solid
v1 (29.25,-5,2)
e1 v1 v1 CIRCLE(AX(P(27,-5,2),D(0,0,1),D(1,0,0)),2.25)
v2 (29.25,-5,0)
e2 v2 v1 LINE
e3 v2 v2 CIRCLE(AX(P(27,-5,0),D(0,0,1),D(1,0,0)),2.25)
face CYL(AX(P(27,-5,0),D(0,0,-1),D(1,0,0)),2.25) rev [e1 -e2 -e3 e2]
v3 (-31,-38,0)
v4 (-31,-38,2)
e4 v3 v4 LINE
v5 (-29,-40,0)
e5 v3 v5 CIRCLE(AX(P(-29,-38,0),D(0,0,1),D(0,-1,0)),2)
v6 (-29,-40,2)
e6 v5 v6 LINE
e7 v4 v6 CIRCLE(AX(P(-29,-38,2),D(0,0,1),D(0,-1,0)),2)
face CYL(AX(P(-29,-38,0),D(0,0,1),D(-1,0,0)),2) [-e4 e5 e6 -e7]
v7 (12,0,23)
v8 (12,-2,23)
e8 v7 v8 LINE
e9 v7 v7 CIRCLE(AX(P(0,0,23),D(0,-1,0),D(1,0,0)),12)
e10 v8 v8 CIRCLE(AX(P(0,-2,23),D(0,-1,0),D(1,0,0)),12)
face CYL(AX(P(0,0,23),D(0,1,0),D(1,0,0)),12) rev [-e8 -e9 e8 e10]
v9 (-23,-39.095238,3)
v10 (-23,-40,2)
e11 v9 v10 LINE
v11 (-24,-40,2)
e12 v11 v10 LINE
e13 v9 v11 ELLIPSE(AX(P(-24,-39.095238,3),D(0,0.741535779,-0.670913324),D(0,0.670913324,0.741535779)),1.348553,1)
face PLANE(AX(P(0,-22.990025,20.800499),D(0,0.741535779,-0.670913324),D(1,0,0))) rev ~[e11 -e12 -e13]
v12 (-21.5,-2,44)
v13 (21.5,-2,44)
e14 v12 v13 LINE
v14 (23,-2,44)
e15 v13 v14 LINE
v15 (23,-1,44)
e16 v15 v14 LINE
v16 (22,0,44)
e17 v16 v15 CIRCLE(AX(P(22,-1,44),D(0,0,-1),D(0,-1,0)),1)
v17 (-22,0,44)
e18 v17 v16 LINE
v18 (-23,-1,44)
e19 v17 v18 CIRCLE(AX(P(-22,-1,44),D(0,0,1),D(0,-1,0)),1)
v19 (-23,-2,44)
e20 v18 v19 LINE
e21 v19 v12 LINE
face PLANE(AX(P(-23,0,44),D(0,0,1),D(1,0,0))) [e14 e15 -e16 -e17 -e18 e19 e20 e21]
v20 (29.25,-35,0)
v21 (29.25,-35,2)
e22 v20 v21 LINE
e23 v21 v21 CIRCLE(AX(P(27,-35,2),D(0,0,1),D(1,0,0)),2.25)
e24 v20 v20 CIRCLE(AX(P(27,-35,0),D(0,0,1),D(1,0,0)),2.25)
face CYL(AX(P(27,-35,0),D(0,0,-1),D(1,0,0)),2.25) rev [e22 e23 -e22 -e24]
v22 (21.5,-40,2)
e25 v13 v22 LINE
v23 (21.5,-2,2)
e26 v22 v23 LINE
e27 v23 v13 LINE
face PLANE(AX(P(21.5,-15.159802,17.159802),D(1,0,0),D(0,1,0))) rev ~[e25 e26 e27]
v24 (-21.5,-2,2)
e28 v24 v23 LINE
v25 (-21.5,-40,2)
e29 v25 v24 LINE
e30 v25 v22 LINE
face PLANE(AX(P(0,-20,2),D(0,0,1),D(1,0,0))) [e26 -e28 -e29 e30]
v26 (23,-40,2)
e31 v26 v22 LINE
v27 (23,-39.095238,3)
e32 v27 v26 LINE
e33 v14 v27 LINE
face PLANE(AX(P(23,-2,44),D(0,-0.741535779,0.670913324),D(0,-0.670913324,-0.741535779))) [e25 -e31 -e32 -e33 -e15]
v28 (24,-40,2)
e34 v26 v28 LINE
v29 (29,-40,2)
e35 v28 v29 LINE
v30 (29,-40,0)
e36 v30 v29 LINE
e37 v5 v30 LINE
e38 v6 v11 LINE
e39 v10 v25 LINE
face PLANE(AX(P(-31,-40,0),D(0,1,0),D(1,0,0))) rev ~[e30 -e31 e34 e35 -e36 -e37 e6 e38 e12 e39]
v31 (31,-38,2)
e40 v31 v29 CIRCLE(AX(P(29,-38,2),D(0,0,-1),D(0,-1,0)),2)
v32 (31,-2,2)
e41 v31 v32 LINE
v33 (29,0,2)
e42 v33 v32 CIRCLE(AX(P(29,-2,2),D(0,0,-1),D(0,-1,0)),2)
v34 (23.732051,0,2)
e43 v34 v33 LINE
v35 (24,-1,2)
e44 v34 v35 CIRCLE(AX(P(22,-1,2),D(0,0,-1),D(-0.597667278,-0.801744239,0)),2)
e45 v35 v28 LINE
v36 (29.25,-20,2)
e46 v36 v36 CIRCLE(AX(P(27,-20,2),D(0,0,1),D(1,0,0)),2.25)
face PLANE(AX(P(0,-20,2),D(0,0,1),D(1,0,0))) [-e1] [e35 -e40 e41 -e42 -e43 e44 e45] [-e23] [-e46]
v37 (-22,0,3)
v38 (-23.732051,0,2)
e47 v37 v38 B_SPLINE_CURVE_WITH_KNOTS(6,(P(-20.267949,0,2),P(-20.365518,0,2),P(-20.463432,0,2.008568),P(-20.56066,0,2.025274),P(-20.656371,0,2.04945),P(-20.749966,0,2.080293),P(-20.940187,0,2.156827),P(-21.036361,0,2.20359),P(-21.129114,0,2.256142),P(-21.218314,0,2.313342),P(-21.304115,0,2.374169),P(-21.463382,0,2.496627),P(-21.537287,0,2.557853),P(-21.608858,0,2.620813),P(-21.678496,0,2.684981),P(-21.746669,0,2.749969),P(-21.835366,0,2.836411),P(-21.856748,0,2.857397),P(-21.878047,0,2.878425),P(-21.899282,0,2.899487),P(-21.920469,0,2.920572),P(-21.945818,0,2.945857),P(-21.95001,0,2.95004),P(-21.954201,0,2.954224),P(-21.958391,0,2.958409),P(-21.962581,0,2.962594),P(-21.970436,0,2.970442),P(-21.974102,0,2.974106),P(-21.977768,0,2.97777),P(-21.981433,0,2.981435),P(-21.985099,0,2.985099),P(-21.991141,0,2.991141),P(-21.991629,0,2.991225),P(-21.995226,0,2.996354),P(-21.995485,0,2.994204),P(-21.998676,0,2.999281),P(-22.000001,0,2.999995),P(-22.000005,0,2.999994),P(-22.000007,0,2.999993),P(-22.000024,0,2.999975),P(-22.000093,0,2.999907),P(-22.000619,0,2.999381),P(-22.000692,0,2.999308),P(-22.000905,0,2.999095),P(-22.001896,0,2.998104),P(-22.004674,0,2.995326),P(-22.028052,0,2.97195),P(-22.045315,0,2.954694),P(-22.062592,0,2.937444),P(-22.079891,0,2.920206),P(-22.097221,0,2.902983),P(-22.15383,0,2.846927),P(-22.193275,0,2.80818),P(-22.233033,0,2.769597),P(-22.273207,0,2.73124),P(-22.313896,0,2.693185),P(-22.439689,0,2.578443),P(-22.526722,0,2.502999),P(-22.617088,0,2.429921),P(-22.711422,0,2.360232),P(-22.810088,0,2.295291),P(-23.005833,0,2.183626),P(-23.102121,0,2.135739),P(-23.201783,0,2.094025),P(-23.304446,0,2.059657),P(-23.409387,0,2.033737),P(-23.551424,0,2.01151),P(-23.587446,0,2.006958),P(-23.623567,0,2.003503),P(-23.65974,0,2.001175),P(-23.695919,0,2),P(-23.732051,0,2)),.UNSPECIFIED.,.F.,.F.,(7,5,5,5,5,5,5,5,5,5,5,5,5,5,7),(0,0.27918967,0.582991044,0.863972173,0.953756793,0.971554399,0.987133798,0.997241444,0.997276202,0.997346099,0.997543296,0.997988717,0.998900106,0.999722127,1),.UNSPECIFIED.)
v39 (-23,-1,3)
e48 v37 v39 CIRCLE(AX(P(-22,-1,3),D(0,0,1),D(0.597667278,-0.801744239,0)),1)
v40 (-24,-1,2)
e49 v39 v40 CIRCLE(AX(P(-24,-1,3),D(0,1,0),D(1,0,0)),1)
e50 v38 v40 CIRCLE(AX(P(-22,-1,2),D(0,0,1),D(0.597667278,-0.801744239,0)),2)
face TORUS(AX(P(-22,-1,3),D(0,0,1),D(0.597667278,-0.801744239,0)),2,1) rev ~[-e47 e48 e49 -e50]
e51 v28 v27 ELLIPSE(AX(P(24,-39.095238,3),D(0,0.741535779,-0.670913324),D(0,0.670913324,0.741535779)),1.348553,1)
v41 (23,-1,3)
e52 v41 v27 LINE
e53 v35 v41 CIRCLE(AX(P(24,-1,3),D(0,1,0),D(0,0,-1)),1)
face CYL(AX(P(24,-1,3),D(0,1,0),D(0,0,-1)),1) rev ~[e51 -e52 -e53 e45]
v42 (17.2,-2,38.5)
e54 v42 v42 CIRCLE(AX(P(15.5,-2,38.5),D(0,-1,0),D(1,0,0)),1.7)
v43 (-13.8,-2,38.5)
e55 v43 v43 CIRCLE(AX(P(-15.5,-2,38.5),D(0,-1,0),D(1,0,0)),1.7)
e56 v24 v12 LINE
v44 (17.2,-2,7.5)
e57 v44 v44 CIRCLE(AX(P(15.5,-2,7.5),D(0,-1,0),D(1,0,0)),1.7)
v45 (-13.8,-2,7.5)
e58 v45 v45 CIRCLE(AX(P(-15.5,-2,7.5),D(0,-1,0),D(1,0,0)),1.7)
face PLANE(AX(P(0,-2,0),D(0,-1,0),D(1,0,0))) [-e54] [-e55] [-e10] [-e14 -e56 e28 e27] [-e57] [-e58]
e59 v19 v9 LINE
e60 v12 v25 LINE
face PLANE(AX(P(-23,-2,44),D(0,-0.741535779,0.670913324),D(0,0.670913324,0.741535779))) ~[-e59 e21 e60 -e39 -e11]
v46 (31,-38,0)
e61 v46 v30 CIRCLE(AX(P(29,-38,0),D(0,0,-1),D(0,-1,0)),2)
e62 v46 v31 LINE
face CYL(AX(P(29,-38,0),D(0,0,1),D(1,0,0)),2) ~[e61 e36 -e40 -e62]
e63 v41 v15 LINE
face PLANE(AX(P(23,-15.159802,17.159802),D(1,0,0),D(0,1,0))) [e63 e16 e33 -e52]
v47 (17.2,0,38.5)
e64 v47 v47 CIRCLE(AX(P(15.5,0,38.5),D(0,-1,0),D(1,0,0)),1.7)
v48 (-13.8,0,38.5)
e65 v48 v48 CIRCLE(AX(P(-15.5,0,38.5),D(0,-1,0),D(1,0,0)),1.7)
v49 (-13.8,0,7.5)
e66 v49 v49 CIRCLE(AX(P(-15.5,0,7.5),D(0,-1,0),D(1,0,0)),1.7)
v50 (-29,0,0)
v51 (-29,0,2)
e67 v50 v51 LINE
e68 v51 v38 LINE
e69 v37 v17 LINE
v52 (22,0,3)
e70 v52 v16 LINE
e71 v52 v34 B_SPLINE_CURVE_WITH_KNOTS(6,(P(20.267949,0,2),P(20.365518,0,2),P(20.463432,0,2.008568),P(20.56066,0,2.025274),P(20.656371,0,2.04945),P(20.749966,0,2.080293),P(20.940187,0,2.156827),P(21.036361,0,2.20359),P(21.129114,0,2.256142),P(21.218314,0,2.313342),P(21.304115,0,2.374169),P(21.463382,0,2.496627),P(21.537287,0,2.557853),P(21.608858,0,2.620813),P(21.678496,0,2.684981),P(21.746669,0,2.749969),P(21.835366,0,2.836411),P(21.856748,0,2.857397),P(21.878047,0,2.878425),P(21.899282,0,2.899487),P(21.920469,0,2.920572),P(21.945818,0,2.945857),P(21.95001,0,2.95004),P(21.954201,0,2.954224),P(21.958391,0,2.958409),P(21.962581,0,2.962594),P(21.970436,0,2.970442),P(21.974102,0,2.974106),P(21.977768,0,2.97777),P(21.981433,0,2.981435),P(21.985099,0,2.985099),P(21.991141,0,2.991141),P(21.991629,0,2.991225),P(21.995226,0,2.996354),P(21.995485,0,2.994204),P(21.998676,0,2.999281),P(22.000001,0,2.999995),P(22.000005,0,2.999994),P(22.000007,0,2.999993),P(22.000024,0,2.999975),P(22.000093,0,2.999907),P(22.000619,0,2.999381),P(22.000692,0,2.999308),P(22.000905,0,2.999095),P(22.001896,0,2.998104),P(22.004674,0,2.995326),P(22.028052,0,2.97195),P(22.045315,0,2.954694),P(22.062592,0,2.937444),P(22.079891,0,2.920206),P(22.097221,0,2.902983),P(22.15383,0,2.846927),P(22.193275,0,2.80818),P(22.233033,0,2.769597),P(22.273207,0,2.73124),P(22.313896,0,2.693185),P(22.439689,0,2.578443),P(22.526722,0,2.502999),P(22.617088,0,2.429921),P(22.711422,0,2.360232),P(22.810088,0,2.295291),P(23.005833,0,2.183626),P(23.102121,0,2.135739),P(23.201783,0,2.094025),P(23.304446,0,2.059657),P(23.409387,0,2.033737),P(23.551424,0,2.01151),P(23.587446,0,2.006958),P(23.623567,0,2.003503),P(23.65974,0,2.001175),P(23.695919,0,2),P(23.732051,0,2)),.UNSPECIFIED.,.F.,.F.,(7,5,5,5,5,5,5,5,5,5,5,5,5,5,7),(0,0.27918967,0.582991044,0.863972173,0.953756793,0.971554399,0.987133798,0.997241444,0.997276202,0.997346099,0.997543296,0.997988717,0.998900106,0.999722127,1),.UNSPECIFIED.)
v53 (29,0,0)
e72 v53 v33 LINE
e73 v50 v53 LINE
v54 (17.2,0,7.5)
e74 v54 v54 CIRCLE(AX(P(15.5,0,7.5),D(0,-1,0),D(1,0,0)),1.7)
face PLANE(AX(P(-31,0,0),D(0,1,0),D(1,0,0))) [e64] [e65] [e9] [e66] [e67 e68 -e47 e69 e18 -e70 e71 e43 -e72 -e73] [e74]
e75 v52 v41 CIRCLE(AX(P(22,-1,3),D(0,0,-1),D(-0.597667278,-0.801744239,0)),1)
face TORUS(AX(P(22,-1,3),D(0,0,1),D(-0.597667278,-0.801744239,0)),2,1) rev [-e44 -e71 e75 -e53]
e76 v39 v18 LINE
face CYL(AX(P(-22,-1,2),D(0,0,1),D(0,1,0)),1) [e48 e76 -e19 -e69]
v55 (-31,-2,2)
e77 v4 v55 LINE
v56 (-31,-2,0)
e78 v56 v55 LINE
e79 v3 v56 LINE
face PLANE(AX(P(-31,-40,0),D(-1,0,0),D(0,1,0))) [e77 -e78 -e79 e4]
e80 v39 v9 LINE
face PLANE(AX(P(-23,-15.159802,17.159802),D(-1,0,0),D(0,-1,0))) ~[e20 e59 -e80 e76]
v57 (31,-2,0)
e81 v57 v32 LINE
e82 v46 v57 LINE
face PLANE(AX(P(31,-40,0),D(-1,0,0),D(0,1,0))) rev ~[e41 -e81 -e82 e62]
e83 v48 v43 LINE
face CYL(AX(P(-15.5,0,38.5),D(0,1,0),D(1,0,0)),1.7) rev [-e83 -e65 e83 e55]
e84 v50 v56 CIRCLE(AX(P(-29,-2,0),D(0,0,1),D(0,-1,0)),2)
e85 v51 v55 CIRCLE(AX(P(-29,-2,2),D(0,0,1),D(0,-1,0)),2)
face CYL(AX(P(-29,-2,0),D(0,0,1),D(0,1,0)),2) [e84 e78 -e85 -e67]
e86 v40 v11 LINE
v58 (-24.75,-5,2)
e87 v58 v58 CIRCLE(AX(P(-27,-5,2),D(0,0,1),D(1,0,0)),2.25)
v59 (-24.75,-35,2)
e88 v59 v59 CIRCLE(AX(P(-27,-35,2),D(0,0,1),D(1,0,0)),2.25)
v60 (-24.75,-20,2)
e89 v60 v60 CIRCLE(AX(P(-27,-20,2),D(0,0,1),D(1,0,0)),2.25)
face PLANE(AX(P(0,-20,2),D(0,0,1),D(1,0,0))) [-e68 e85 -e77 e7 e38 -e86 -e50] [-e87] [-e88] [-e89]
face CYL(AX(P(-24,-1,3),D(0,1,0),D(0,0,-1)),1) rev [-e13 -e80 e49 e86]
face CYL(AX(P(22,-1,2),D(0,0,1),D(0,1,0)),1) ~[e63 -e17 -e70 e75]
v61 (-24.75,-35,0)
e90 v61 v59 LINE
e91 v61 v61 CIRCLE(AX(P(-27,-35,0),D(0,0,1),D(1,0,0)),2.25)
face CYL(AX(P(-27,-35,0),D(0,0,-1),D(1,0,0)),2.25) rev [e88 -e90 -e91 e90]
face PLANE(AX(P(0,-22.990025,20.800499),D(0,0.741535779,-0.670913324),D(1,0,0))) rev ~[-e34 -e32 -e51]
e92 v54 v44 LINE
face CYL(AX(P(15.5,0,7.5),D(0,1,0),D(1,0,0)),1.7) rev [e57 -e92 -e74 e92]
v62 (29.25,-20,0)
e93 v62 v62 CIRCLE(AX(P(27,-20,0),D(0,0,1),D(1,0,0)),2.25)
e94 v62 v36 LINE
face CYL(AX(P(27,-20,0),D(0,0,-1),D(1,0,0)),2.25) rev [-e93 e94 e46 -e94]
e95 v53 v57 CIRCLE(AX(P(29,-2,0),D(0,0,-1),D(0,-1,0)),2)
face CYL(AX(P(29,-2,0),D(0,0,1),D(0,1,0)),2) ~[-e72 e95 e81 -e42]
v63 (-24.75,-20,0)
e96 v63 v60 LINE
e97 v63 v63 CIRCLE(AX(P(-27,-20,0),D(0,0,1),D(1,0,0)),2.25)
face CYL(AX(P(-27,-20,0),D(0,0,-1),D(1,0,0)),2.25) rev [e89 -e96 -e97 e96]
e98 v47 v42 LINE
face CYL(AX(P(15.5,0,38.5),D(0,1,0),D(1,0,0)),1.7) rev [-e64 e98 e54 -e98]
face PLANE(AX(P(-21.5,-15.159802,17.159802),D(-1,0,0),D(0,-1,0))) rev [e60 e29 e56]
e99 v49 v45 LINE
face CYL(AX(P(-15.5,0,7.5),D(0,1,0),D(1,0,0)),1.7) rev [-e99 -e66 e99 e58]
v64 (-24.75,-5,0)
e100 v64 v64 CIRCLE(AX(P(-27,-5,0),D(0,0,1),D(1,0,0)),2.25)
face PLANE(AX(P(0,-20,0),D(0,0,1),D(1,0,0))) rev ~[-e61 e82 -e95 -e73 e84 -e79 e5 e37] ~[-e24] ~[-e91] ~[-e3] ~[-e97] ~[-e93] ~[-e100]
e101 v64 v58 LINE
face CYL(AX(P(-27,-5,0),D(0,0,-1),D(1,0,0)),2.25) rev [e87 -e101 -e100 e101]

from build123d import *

# Parameters (mm, degrees)
F0_W         = 62
F0_H         = 40
F0_R         = 2.25
F1_DEPTH     = 2
F2_W         = 46
F2_H         = 42
F2_R         = 1.7
F2_R_2       = 12
F3_DEPTH     = 2
F5_DEPTH     = 1.5
F6_R         = 2
F7_R         = 1
F8_T4_DEPTH  = 41.5
F8_T9_ANGLE  = 233.2969892374
F8_T15_ANGLE = 233.2969892374
F8_T21_DEPTH = 41.5


# Not quite as in the source:
# - a fillet or chamfer that OpenCascade refuses, or shapes differently, is made with other operations: its cross-section is extruded or revolved along the edge and cut away or added
# - a pattern or mirror of a feature is missing from the dataset's text; its kind, count and spacing are read off the source's solid


with BuildPart() as f1:
    # F0 (on Top) → F1 (new body)
    with BuildSketch(Plane.XY):
        with Locations((0, -20)):
            Rectangle(F0_W, F0_H)
        with Locations((-27, -35)):
            Circle(F0_R, mode=Mode.SUBTRACT)
        with Locations((27, -35)):
            Circle(F0_R, mode=Mode.SUBTRACT)
        with Locations((-27, -20)):
            Circle(F0_R, mode=Mode.SUBTRACT)
        with Locations((-27, -5)):
            Circle(F0_R, mode=Mode.SUBTRACT)
        with Locations((27, -20)):
            Circle(F0_R, mode=Mode.SUBTRACT)
        with Locations((27, -5)):
            Circle(F0_R, mode=Mode.SUBTRACT)
    extrude(amount=F1_DEPTH)

    # F2 (on Front) → F3 (join)
    with BuildSketch(Plane.XZ):
        with Locations((0, 23)):
            Rectangle(F2_W, F2_H)
        with Locations((-15.5, 7.5)):
            Circle(F2_R, mode=Mode.SUBTRACT)
        with Locations((15.5, 7.5)):
            Circle(F2_R, mode=Mode.SUBTRACT)
        with Locations((-15.5, 38.5)):
            Circle(F2_R, mode=Mode.SUBTRACT)
        with Locations((0, 23)):
            Circle(F2_R_2, mode=Mode.SUBTRACT)
        with Locations((15.5, 38.5)):
            Circle(F2_R, mode=Mode.SUBTRACT)
    extrude(amount=F3_DEPTH)

    # F4 (on face) → F5 (join)
    with BuildSketch(Plane.YZ.offset(23)):
        Polygon((-2, 2), (-2, 44), (-40, 2), align=None)
    f5 = extrude(amount=-F5_DEPTH)

    # F5_copies: F5 across plane
    add(f5.mirror(Plane(origin=(0, 0, 0), x_dir=(0, 0, -1), z_dir=(-1, 0, 0))))

    # F6
    f6_edges = [f1.edges().sort_by_distance(p)[0] for p in [
        (31, -40, 1),
        (31, 0, 1),
        (-31, 0, 1),
        (-31, -40, 1),
    ]]
    fillet(f6_edges, radius=F6_R)

    # F7
    f7_edges = [f1.edges().sort_by_distance(p)[0] for p in [
        (-23, 0, 23),
        (23, 0, 23),
    ]]
    fillet(f7_edges, radius=F7_R)

    # F8: fillet of radius 1 on 4 edges, made by hand


with BuildPart() as f8_tool2:
    # F8_s3 → F8_t4 (new body)
    with BuildSketch(Plane.XZ.offset(1)):
        with BuildLine():
            ThreePointArc((24, 2), (23.2928932188, 2.2928932188), (23, 3))
            Line((23, 3), (23, 2))
            Line((23, 2), (24, 2))
        make_face()
    extrude(amount=F8_T4_DEPTH)

    split(bisect_by=Plane(origin=(0, -22.9900249377, 20.8004987531), x_dir=(1, 0, 0), z_dir=(0, 0.7415357791, -0.670913324)), keep=Keep.TOP)


with BuildPart() as f1_1:
    add(f1.part)

    # F8_t1: union F8_tool2
    add(f8_tool2.part)


with BuildPart() as f8_tool7:
    # F8_s8 → F8_t9 (revolve)
    with BuildSketch(Plane(origin=(14.6206404523, -10.8990847056, 0), x_dir=(0, 0, 1), z_dir=(0.8017442393, -0.5976672776, 0))):
        with BuildLine():
            ThreePointArc((3, -11.3469358686), (2.2928932188, -11.0540426498), (2, -10.3469358686))
            Line((2, -10.3469358686), (2, -11.3469358686))
            Line((2, -11.3469358686), (3, -11.3469358686))
        make_face()
    revolve(axis=Axis((22, -1, 2), (0, 0, -1)), revolution_arc=F8_T9_ANGLE)

    split(bisect_by=Plane.XZ, keep=Keep.TOP)

    split(bisect_by=Plane.XZ.offset(2), keep=Keep.BOTTOM)


with BuildPart() as f1_2:
    add(f1_1.part)

    # F8_t6: union F8_tool7
    add(f8_tool7.part)


with BuildPart() as f8_tool13:
    # F8_s14 → F8_t15 (revolve)
    with BuildSketch(Plane(origin=(-14.6206404523, -10.8990847056, 0), x_dir=(0, 0, 1), z_dir=(-0.8017442393, -0.5976672776, 0))):
        with BuildLine():
            ThreePointArc((3, 11.3469358686), (2.2928932188, 11.0540426498), (2, 10.3469358686))
            Line((2, 10.3469358686), (2, 11.3469358686))
            Line((2, 11.3469358686), (3, 11.3469358686))
        make_face()
    revolve(axis=Axis((-22, -1, 2), (0, 0, 1)), revolution_arc=F8_T15_ANGLE)

    split(bisect_by=Plane.XZ, keep=Keep.TOP)

    split(bisect_by=Plane.XZ.offset(2), keep=Keep.BOTTOM)


with BuildPart() as f1_3:
    add(f1_2.part)

    # F8_t12: union F8_tool13
    add(f8_tool13.part)


with BuildPart() as f8_tool19:
    # F8_s20 → F8_t21 (new body)
    with BuildSketch(Plane.XZ.offset(1)):
        with BuildLine():
            ThreePointArc((-24, 2), (-23.2928932188, 2.2928932188), (-23, 3))
            Line((-23, 3), (-23, 2))
            Line((-23, 2), (-24, 2))
        make_face()
    extrude(amount=F8_T21_DEPTH)

    split(bisect_by=Plane(origin=(0, -22.9900249377, 20.8004987531), x_dir=(1, 0, 0), z_dir=(0, 0.7415357791, -0.670913324)), keep=Keep.TOP)


with BuildPart() as f1_4:
    add(f1_3.part)

    # F8_t18: union F8_tool19
    add(f8_tool19.part)


solid = f1_4.part
